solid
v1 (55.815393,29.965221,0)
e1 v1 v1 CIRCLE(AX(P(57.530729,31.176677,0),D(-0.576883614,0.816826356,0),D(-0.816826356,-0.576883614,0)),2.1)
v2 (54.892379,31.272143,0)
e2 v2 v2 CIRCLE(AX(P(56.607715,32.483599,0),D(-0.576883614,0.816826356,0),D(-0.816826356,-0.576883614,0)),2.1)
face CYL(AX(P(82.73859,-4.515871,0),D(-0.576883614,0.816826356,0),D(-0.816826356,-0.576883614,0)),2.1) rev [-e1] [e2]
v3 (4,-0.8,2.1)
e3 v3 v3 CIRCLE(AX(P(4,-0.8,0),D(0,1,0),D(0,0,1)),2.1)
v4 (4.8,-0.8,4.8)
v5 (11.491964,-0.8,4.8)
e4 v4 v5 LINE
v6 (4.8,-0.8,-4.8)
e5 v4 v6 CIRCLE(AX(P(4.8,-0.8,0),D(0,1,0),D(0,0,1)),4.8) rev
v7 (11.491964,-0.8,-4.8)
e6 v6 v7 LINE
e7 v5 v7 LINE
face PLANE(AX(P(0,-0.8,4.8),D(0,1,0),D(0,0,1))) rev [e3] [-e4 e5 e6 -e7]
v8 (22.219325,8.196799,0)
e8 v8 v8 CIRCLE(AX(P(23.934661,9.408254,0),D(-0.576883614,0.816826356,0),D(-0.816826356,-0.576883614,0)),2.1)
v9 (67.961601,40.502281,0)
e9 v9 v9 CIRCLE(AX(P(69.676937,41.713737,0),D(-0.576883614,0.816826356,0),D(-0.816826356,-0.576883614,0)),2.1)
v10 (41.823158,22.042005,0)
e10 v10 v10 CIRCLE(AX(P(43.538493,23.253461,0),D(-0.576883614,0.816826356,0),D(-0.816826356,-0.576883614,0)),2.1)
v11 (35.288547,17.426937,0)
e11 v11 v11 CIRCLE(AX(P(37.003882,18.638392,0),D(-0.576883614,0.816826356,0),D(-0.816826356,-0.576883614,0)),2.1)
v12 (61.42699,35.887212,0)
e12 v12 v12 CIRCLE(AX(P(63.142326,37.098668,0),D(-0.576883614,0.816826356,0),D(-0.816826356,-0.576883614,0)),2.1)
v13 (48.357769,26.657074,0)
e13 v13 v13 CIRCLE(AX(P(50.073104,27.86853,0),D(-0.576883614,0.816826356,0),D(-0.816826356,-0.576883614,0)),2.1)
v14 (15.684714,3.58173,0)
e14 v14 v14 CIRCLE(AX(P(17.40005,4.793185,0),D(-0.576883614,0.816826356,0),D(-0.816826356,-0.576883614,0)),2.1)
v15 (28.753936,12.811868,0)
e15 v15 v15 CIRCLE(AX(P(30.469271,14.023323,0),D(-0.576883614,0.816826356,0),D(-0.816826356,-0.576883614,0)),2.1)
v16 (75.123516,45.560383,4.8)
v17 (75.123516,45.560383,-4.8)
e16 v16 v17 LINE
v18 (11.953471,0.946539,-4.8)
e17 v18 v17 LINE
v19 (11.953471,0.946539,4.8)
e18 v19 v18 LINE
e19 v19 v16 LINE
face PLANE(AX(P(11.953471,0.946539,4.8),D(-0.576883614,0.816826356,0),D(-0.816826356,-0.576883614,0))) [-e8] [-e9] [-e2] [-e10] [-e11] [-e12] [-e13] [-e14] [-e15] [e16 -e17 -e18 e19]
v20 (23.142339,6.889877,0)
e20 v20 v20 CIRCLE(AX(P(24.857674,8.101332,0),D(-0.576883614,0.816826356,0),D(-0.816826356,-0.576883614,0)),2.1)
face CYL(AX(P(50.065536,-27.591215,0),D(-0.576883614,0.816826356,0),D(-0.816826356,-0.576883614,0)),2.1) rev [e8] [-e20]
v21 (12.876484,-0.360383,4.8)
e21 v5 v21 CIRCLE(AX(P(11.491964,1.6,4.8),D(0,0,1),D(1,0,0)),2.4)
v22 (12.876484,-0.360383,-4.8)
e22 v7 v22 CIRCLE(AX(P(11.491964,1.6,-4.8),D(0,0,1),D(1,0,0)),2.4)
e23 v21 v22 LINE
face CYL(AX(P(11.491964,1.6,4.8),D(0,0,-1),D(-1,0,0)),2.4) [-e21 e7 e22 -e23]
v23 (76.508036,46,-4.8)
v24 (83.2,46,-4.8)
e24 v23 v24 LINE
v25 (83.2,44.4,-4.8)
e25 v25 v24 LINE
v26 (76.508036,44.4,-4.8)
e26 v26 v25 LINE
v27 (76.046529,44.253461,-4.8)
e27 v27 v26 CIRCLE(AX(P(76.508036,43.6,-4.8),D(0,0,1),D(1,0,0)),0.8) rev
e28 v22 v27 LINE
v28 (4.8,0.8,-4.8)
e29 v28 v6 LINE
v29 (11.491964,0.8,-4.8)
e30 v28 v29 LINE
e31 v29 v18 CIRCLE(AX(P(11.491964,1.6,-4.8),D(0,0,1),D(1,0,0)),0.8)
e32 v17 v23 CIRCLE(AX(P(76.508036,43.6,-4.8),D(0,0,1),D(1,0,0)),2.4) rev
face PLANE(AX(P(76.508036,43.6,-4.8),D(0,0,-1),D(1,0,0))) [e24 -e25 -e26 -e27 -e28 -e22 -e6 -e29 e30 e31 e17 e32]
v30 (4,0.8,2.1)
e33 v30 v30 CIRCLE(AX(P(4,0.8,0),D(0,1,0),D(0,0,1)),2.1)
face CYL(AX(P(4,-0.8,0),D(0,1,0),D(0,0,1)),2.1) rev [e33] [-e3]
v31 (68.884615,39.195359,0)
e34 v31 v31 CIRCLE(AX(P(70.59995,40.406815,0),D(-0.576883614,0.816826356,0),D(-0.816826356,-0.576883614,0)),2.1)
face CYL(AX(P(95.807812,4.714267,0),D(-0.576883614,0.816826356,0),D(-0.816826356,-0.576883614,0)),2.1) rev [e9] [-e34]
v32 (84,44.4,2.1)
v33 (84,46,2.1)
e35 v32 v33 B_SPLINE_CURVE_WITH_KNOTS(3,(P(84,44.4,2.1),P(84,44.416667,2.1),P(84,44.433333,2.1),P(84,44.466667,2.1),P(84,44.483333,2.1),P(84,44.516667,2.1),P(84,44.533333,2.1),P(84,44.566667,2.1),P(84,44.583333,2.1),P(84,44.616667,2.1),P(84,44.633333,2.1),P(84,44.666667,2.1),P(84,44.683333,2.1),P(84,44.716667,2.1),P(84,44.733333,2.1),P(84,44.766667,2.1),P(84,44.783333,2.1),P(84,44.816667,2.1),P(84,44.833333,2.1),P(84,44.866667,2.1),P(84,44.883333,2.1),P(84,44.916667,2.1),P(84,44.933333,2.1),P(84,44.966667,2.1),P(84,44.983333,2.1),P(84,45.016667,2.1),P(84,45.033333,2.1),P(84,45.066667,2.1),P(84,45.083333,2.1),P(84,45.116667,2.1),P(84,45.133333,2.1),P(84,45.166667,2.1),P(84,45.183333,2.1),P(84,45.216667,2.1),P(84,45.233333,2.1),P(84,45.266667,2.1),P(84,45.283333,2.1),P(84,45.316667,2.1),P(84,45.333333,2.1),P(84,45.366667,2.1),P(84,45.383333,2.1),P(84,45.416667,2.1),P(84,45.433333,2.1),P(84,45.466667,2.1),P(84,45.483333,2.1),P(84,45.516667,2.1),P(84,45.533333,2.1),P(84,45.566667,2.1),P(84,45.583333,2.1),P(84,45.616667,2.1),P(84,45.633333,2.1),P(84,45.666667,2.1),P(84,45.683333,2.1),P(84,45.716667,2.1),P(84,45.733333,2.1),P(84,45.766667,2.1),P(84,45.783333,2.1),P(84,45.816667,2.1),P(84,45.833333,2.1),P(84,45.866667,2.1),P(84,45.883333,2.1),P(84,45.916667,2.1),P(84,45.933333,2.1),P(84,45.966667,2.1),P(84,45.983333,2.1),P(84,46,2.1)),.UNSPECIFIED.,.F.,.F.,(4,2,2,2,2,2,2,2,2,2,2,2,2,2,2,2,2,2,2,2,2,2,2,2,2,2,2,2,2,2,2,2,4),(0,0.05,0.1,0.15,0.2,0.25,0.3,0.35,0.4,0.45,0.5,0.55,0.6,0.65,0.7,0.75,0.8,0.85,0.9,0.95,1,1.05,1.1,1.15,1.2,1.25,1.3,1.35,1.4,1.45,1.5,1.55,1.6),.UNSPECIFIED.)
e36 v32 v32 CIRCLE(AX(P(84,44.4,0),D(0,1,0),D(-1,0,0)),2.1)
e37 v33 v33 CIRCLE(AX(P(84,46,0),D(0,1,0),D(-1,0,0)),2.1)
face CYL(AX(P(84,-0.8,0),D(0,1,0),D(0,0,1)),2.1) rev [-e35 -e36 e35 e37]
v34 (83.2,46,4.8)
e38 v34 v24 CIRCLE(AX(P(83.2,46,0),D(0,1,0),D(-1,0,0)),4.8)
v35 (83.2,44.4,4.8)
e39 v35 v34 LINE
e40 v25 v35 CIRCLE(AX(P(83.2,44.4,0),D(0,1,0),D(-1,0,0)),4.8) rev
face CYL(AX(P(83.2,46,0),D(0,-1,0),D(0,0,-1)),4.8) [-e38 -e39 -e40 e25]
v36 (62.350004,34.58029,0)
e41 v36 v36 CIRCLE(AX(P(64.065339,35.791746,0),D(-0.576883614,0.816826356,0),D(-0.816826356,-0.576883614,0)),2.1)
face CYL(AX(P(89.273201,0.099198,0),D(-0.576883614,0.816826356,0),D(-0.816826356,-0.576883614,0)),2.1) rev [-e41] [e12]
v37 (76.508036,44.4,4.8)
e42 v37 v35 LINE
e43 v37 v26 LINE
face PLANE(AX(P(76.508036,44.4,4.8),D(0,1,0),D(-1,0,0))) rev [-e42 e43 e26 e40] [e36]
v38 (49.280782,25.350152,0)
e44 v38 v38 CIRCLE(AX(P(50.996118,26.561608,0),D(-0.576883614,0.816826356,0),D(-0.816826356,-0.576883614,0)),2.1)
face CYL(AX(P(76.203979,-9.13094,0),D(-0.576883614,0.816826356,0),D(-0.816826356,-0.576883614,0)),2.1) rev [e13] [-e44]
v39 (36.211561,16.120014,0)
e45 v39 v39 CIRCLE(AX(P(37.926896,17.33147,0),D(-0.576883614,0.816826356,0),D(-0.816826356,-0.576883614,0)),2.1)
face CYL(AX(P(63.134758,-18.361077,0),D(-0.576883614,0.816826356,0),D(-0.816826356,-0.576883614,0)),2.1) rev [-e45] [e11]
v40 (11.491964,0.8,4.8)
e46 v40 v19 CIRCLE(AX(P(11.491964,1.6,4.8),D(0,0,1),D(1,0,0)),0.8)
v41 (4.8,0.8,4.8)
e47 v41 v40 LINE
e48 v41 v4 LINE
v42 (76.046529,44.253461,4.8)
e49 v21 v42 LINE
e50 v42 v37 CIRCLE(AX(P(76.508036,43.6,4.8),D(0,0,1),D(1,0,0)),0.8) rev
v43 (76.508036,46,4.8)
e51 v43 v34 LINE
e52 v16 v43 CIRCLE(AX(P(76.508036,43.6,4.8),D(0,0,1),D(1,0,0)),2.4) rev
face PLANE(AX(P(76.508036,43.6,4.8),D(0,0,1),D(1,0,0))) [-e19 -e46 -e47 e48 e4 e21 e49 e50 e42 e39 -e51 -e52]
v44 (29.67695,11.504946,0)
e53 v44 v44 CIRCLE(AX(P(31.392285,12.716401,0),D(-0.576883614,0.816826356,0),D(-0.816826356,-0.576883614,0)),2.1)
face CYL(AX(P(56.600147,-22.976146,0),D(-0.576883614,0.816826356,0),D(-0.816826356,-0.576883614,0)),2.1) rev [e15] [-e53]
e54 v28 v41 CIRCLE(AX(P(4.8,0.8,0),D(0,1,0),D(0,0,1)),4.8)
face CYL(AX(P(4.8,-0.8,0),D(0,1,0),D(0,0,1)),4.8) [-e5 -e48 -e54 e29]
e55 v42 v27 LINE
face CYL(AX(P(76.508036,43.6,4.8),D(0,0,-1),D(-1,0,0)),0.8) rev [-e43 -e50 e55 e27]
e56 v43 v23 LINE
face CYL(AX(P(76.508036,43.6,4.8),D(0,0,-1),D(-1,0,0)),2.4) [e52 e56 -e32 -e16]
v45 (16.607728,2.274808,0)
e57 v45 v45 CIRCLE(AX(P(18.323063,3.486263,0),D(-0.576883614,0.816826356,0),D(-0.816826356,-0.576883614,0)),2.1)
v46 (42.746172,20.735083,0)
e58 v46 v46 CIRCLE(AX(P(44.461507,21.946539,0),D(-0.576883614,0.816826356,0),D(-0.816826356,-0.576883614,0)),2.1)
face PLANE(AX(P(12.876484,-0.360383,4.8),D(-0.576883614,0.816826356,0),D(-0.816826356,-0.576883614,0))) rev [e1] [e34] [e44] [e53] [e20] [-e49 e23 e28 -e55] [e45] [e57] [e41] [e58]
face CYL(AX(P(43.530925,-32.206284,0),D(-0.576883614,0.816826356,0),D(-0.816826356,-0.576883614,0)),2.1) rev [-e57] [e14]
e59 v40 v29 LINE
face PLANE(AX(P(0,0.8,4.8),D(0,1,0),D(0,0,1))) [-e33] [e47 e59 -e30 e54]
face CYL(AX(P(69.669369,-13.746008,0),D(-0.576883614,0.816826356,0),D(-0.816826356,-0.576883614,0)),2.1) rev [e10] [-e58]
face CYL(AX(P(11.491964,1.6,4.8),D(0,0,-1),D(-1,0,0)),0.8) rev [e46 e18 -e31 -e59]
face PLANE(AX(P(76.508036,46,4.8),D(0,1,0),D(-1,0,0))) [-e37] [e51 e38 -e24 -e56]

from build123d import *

# Parameters (mm, degrees)
EXTRUDE_THIN1_DEPTH = 4.8
SKETCH2_R           = 2.1
CUT_EXTRUDE1_DEPTH  = 100.04584797
SKETCH3_R           = 2.1
CUT_EXTRUDE2_DEPTH  = 100.786171387
FILLET1_R           = 4.8
SKETCH4_R           = 2.1
CUT_EXTRUDE3_DEPTH  = 99.787603571
LPATTERN1_COUNT     = 5
LPATTERN1_PITCH     = 8
LPATTERN2_COUNT     = 5
LPATTERN2_PITCH     = 8


with BuildPart() as part:
    # Sketch1 → Extrude-Thin1 (new body)
    with BuildSketch(Plane.XY):
        with BuildLine():
            Line((0, -0.8), (11.491963677, -0.8))
            ThreePointArc((11.491963677, -0.8), (12.218283231, -0.687457083), (12.87648435, -0.360383255))
            Line((12.87648435, -0.360383255), (76.046529432, 44.253461085))
            ThreePointArc((76.046529432, 44.253461085), (76.265929805, 44.362485694), (76.508036323, 44.4))
            Line((76.508036323, 44.4), (88, 44.4))
            Line((88, 44.4), (88, 46))
            Line((88, 46), (76.508036323, 46))
            ThreePointArc((76.508036323, 46), (75.781716769, 45.887457083), (75.12351565, 45.560383255))
            Line((75.12351565, 45.560383255), (11.953470568, 0.946538915))
            ThreePointArc((11.953470568, 0.946538915), (11.734070195, 0.837514306), (11.491963677, 0.8))
            Line((11.491963677, 0.8), (0, 0.8))
            Line((0, 0.8), (0, -0.8))
        make_face()
    extrude(amount=EXTRUDE_THIN1_DEPTH)

    # Sketch2 → Cut-Extrude1 (cut, through all)
    with BuildSketch(Plane(origin=(0, 0.8, 0), x_dir=(1, 0, 0), z_dir=(0, 1, 0))):
        with Locations((4, 0)):
            Circle(SKETCH2_R)
    extrude(amount=-CUT_EXTRUDE1_DEPTH, mode=Mode.SUBTRACT)

    # Sketch3 → Cut-Extrude2 (cut, through all)
    with BuildSketch(Plane(origin=(0, 46, 0), x_dir=(1, 0, 0), z_dir=(0, 1, 0))):
        with Locations((84, 0)):
            Circle(SKETCH3_R)
    extrude(amount=-CUT_EXTRUDE2_DEPTH, mode=Mode.SUBTRACT)

    # Fillet1
    fillet1_edges = [part.edges().sort_by_distance(p)[0] for p in [
        (0, 0, 4.8),
        (88, 45.2, 4.8),
    ]]
    fillet(fillet1_edges, radius=FILLET1_R - 0.0001)  # a hair under: the kernel refuses the full size

    # Sketch4 → Cut-Extrude3 (cut, through all)
    with BuildSketch(Plane(origin=(3.532029558, -5.001103798, 0), x_dir=(0.816826356052519, 0.5768836139620918, 0), z_dir=(-0.5768836139620916, 0.8168263560525189, 0))):
        with Locations((48.977929342, 0)):
            Circle(SKETCH4_R)
    cut_extrude3 = extrude(amount=-CUT_EXTRUDE3_DEPTH, mode=Mode.SUBTRACT)

    # LPattern1: Cut-Extrude3 ×5
    with Locations(*[Vector(0.8168263560525189, 0.5768836139620918, 0) * (i * LPATTERN1_PITCH) for i in range(1, LPATTERN1_COUNT)]):
        add(cut_extrude3, mode=Mode.SUBTRACT)

    # LPattern2: Cut-Extrude3 ×5
    with Locations(*[Vector(-0.8168263560525189, -0.5768836139620918, 0) * (i * LPATTERN2_PITCH) for i in range(1, LPATTERN2_COUNT)]):
        add(cut_extrude3, mode=Mode.SUBTRACT)

    # Mirror1: part across plane


with BuildPart() as part_1:
    add(part.part)
    add(part.part.mirror(Plane(origin=(76.508036323, 43.6, 0), x_dir=(1, 0, 0), z_dir=(0, 0, 1))))


solid = part_1.part
